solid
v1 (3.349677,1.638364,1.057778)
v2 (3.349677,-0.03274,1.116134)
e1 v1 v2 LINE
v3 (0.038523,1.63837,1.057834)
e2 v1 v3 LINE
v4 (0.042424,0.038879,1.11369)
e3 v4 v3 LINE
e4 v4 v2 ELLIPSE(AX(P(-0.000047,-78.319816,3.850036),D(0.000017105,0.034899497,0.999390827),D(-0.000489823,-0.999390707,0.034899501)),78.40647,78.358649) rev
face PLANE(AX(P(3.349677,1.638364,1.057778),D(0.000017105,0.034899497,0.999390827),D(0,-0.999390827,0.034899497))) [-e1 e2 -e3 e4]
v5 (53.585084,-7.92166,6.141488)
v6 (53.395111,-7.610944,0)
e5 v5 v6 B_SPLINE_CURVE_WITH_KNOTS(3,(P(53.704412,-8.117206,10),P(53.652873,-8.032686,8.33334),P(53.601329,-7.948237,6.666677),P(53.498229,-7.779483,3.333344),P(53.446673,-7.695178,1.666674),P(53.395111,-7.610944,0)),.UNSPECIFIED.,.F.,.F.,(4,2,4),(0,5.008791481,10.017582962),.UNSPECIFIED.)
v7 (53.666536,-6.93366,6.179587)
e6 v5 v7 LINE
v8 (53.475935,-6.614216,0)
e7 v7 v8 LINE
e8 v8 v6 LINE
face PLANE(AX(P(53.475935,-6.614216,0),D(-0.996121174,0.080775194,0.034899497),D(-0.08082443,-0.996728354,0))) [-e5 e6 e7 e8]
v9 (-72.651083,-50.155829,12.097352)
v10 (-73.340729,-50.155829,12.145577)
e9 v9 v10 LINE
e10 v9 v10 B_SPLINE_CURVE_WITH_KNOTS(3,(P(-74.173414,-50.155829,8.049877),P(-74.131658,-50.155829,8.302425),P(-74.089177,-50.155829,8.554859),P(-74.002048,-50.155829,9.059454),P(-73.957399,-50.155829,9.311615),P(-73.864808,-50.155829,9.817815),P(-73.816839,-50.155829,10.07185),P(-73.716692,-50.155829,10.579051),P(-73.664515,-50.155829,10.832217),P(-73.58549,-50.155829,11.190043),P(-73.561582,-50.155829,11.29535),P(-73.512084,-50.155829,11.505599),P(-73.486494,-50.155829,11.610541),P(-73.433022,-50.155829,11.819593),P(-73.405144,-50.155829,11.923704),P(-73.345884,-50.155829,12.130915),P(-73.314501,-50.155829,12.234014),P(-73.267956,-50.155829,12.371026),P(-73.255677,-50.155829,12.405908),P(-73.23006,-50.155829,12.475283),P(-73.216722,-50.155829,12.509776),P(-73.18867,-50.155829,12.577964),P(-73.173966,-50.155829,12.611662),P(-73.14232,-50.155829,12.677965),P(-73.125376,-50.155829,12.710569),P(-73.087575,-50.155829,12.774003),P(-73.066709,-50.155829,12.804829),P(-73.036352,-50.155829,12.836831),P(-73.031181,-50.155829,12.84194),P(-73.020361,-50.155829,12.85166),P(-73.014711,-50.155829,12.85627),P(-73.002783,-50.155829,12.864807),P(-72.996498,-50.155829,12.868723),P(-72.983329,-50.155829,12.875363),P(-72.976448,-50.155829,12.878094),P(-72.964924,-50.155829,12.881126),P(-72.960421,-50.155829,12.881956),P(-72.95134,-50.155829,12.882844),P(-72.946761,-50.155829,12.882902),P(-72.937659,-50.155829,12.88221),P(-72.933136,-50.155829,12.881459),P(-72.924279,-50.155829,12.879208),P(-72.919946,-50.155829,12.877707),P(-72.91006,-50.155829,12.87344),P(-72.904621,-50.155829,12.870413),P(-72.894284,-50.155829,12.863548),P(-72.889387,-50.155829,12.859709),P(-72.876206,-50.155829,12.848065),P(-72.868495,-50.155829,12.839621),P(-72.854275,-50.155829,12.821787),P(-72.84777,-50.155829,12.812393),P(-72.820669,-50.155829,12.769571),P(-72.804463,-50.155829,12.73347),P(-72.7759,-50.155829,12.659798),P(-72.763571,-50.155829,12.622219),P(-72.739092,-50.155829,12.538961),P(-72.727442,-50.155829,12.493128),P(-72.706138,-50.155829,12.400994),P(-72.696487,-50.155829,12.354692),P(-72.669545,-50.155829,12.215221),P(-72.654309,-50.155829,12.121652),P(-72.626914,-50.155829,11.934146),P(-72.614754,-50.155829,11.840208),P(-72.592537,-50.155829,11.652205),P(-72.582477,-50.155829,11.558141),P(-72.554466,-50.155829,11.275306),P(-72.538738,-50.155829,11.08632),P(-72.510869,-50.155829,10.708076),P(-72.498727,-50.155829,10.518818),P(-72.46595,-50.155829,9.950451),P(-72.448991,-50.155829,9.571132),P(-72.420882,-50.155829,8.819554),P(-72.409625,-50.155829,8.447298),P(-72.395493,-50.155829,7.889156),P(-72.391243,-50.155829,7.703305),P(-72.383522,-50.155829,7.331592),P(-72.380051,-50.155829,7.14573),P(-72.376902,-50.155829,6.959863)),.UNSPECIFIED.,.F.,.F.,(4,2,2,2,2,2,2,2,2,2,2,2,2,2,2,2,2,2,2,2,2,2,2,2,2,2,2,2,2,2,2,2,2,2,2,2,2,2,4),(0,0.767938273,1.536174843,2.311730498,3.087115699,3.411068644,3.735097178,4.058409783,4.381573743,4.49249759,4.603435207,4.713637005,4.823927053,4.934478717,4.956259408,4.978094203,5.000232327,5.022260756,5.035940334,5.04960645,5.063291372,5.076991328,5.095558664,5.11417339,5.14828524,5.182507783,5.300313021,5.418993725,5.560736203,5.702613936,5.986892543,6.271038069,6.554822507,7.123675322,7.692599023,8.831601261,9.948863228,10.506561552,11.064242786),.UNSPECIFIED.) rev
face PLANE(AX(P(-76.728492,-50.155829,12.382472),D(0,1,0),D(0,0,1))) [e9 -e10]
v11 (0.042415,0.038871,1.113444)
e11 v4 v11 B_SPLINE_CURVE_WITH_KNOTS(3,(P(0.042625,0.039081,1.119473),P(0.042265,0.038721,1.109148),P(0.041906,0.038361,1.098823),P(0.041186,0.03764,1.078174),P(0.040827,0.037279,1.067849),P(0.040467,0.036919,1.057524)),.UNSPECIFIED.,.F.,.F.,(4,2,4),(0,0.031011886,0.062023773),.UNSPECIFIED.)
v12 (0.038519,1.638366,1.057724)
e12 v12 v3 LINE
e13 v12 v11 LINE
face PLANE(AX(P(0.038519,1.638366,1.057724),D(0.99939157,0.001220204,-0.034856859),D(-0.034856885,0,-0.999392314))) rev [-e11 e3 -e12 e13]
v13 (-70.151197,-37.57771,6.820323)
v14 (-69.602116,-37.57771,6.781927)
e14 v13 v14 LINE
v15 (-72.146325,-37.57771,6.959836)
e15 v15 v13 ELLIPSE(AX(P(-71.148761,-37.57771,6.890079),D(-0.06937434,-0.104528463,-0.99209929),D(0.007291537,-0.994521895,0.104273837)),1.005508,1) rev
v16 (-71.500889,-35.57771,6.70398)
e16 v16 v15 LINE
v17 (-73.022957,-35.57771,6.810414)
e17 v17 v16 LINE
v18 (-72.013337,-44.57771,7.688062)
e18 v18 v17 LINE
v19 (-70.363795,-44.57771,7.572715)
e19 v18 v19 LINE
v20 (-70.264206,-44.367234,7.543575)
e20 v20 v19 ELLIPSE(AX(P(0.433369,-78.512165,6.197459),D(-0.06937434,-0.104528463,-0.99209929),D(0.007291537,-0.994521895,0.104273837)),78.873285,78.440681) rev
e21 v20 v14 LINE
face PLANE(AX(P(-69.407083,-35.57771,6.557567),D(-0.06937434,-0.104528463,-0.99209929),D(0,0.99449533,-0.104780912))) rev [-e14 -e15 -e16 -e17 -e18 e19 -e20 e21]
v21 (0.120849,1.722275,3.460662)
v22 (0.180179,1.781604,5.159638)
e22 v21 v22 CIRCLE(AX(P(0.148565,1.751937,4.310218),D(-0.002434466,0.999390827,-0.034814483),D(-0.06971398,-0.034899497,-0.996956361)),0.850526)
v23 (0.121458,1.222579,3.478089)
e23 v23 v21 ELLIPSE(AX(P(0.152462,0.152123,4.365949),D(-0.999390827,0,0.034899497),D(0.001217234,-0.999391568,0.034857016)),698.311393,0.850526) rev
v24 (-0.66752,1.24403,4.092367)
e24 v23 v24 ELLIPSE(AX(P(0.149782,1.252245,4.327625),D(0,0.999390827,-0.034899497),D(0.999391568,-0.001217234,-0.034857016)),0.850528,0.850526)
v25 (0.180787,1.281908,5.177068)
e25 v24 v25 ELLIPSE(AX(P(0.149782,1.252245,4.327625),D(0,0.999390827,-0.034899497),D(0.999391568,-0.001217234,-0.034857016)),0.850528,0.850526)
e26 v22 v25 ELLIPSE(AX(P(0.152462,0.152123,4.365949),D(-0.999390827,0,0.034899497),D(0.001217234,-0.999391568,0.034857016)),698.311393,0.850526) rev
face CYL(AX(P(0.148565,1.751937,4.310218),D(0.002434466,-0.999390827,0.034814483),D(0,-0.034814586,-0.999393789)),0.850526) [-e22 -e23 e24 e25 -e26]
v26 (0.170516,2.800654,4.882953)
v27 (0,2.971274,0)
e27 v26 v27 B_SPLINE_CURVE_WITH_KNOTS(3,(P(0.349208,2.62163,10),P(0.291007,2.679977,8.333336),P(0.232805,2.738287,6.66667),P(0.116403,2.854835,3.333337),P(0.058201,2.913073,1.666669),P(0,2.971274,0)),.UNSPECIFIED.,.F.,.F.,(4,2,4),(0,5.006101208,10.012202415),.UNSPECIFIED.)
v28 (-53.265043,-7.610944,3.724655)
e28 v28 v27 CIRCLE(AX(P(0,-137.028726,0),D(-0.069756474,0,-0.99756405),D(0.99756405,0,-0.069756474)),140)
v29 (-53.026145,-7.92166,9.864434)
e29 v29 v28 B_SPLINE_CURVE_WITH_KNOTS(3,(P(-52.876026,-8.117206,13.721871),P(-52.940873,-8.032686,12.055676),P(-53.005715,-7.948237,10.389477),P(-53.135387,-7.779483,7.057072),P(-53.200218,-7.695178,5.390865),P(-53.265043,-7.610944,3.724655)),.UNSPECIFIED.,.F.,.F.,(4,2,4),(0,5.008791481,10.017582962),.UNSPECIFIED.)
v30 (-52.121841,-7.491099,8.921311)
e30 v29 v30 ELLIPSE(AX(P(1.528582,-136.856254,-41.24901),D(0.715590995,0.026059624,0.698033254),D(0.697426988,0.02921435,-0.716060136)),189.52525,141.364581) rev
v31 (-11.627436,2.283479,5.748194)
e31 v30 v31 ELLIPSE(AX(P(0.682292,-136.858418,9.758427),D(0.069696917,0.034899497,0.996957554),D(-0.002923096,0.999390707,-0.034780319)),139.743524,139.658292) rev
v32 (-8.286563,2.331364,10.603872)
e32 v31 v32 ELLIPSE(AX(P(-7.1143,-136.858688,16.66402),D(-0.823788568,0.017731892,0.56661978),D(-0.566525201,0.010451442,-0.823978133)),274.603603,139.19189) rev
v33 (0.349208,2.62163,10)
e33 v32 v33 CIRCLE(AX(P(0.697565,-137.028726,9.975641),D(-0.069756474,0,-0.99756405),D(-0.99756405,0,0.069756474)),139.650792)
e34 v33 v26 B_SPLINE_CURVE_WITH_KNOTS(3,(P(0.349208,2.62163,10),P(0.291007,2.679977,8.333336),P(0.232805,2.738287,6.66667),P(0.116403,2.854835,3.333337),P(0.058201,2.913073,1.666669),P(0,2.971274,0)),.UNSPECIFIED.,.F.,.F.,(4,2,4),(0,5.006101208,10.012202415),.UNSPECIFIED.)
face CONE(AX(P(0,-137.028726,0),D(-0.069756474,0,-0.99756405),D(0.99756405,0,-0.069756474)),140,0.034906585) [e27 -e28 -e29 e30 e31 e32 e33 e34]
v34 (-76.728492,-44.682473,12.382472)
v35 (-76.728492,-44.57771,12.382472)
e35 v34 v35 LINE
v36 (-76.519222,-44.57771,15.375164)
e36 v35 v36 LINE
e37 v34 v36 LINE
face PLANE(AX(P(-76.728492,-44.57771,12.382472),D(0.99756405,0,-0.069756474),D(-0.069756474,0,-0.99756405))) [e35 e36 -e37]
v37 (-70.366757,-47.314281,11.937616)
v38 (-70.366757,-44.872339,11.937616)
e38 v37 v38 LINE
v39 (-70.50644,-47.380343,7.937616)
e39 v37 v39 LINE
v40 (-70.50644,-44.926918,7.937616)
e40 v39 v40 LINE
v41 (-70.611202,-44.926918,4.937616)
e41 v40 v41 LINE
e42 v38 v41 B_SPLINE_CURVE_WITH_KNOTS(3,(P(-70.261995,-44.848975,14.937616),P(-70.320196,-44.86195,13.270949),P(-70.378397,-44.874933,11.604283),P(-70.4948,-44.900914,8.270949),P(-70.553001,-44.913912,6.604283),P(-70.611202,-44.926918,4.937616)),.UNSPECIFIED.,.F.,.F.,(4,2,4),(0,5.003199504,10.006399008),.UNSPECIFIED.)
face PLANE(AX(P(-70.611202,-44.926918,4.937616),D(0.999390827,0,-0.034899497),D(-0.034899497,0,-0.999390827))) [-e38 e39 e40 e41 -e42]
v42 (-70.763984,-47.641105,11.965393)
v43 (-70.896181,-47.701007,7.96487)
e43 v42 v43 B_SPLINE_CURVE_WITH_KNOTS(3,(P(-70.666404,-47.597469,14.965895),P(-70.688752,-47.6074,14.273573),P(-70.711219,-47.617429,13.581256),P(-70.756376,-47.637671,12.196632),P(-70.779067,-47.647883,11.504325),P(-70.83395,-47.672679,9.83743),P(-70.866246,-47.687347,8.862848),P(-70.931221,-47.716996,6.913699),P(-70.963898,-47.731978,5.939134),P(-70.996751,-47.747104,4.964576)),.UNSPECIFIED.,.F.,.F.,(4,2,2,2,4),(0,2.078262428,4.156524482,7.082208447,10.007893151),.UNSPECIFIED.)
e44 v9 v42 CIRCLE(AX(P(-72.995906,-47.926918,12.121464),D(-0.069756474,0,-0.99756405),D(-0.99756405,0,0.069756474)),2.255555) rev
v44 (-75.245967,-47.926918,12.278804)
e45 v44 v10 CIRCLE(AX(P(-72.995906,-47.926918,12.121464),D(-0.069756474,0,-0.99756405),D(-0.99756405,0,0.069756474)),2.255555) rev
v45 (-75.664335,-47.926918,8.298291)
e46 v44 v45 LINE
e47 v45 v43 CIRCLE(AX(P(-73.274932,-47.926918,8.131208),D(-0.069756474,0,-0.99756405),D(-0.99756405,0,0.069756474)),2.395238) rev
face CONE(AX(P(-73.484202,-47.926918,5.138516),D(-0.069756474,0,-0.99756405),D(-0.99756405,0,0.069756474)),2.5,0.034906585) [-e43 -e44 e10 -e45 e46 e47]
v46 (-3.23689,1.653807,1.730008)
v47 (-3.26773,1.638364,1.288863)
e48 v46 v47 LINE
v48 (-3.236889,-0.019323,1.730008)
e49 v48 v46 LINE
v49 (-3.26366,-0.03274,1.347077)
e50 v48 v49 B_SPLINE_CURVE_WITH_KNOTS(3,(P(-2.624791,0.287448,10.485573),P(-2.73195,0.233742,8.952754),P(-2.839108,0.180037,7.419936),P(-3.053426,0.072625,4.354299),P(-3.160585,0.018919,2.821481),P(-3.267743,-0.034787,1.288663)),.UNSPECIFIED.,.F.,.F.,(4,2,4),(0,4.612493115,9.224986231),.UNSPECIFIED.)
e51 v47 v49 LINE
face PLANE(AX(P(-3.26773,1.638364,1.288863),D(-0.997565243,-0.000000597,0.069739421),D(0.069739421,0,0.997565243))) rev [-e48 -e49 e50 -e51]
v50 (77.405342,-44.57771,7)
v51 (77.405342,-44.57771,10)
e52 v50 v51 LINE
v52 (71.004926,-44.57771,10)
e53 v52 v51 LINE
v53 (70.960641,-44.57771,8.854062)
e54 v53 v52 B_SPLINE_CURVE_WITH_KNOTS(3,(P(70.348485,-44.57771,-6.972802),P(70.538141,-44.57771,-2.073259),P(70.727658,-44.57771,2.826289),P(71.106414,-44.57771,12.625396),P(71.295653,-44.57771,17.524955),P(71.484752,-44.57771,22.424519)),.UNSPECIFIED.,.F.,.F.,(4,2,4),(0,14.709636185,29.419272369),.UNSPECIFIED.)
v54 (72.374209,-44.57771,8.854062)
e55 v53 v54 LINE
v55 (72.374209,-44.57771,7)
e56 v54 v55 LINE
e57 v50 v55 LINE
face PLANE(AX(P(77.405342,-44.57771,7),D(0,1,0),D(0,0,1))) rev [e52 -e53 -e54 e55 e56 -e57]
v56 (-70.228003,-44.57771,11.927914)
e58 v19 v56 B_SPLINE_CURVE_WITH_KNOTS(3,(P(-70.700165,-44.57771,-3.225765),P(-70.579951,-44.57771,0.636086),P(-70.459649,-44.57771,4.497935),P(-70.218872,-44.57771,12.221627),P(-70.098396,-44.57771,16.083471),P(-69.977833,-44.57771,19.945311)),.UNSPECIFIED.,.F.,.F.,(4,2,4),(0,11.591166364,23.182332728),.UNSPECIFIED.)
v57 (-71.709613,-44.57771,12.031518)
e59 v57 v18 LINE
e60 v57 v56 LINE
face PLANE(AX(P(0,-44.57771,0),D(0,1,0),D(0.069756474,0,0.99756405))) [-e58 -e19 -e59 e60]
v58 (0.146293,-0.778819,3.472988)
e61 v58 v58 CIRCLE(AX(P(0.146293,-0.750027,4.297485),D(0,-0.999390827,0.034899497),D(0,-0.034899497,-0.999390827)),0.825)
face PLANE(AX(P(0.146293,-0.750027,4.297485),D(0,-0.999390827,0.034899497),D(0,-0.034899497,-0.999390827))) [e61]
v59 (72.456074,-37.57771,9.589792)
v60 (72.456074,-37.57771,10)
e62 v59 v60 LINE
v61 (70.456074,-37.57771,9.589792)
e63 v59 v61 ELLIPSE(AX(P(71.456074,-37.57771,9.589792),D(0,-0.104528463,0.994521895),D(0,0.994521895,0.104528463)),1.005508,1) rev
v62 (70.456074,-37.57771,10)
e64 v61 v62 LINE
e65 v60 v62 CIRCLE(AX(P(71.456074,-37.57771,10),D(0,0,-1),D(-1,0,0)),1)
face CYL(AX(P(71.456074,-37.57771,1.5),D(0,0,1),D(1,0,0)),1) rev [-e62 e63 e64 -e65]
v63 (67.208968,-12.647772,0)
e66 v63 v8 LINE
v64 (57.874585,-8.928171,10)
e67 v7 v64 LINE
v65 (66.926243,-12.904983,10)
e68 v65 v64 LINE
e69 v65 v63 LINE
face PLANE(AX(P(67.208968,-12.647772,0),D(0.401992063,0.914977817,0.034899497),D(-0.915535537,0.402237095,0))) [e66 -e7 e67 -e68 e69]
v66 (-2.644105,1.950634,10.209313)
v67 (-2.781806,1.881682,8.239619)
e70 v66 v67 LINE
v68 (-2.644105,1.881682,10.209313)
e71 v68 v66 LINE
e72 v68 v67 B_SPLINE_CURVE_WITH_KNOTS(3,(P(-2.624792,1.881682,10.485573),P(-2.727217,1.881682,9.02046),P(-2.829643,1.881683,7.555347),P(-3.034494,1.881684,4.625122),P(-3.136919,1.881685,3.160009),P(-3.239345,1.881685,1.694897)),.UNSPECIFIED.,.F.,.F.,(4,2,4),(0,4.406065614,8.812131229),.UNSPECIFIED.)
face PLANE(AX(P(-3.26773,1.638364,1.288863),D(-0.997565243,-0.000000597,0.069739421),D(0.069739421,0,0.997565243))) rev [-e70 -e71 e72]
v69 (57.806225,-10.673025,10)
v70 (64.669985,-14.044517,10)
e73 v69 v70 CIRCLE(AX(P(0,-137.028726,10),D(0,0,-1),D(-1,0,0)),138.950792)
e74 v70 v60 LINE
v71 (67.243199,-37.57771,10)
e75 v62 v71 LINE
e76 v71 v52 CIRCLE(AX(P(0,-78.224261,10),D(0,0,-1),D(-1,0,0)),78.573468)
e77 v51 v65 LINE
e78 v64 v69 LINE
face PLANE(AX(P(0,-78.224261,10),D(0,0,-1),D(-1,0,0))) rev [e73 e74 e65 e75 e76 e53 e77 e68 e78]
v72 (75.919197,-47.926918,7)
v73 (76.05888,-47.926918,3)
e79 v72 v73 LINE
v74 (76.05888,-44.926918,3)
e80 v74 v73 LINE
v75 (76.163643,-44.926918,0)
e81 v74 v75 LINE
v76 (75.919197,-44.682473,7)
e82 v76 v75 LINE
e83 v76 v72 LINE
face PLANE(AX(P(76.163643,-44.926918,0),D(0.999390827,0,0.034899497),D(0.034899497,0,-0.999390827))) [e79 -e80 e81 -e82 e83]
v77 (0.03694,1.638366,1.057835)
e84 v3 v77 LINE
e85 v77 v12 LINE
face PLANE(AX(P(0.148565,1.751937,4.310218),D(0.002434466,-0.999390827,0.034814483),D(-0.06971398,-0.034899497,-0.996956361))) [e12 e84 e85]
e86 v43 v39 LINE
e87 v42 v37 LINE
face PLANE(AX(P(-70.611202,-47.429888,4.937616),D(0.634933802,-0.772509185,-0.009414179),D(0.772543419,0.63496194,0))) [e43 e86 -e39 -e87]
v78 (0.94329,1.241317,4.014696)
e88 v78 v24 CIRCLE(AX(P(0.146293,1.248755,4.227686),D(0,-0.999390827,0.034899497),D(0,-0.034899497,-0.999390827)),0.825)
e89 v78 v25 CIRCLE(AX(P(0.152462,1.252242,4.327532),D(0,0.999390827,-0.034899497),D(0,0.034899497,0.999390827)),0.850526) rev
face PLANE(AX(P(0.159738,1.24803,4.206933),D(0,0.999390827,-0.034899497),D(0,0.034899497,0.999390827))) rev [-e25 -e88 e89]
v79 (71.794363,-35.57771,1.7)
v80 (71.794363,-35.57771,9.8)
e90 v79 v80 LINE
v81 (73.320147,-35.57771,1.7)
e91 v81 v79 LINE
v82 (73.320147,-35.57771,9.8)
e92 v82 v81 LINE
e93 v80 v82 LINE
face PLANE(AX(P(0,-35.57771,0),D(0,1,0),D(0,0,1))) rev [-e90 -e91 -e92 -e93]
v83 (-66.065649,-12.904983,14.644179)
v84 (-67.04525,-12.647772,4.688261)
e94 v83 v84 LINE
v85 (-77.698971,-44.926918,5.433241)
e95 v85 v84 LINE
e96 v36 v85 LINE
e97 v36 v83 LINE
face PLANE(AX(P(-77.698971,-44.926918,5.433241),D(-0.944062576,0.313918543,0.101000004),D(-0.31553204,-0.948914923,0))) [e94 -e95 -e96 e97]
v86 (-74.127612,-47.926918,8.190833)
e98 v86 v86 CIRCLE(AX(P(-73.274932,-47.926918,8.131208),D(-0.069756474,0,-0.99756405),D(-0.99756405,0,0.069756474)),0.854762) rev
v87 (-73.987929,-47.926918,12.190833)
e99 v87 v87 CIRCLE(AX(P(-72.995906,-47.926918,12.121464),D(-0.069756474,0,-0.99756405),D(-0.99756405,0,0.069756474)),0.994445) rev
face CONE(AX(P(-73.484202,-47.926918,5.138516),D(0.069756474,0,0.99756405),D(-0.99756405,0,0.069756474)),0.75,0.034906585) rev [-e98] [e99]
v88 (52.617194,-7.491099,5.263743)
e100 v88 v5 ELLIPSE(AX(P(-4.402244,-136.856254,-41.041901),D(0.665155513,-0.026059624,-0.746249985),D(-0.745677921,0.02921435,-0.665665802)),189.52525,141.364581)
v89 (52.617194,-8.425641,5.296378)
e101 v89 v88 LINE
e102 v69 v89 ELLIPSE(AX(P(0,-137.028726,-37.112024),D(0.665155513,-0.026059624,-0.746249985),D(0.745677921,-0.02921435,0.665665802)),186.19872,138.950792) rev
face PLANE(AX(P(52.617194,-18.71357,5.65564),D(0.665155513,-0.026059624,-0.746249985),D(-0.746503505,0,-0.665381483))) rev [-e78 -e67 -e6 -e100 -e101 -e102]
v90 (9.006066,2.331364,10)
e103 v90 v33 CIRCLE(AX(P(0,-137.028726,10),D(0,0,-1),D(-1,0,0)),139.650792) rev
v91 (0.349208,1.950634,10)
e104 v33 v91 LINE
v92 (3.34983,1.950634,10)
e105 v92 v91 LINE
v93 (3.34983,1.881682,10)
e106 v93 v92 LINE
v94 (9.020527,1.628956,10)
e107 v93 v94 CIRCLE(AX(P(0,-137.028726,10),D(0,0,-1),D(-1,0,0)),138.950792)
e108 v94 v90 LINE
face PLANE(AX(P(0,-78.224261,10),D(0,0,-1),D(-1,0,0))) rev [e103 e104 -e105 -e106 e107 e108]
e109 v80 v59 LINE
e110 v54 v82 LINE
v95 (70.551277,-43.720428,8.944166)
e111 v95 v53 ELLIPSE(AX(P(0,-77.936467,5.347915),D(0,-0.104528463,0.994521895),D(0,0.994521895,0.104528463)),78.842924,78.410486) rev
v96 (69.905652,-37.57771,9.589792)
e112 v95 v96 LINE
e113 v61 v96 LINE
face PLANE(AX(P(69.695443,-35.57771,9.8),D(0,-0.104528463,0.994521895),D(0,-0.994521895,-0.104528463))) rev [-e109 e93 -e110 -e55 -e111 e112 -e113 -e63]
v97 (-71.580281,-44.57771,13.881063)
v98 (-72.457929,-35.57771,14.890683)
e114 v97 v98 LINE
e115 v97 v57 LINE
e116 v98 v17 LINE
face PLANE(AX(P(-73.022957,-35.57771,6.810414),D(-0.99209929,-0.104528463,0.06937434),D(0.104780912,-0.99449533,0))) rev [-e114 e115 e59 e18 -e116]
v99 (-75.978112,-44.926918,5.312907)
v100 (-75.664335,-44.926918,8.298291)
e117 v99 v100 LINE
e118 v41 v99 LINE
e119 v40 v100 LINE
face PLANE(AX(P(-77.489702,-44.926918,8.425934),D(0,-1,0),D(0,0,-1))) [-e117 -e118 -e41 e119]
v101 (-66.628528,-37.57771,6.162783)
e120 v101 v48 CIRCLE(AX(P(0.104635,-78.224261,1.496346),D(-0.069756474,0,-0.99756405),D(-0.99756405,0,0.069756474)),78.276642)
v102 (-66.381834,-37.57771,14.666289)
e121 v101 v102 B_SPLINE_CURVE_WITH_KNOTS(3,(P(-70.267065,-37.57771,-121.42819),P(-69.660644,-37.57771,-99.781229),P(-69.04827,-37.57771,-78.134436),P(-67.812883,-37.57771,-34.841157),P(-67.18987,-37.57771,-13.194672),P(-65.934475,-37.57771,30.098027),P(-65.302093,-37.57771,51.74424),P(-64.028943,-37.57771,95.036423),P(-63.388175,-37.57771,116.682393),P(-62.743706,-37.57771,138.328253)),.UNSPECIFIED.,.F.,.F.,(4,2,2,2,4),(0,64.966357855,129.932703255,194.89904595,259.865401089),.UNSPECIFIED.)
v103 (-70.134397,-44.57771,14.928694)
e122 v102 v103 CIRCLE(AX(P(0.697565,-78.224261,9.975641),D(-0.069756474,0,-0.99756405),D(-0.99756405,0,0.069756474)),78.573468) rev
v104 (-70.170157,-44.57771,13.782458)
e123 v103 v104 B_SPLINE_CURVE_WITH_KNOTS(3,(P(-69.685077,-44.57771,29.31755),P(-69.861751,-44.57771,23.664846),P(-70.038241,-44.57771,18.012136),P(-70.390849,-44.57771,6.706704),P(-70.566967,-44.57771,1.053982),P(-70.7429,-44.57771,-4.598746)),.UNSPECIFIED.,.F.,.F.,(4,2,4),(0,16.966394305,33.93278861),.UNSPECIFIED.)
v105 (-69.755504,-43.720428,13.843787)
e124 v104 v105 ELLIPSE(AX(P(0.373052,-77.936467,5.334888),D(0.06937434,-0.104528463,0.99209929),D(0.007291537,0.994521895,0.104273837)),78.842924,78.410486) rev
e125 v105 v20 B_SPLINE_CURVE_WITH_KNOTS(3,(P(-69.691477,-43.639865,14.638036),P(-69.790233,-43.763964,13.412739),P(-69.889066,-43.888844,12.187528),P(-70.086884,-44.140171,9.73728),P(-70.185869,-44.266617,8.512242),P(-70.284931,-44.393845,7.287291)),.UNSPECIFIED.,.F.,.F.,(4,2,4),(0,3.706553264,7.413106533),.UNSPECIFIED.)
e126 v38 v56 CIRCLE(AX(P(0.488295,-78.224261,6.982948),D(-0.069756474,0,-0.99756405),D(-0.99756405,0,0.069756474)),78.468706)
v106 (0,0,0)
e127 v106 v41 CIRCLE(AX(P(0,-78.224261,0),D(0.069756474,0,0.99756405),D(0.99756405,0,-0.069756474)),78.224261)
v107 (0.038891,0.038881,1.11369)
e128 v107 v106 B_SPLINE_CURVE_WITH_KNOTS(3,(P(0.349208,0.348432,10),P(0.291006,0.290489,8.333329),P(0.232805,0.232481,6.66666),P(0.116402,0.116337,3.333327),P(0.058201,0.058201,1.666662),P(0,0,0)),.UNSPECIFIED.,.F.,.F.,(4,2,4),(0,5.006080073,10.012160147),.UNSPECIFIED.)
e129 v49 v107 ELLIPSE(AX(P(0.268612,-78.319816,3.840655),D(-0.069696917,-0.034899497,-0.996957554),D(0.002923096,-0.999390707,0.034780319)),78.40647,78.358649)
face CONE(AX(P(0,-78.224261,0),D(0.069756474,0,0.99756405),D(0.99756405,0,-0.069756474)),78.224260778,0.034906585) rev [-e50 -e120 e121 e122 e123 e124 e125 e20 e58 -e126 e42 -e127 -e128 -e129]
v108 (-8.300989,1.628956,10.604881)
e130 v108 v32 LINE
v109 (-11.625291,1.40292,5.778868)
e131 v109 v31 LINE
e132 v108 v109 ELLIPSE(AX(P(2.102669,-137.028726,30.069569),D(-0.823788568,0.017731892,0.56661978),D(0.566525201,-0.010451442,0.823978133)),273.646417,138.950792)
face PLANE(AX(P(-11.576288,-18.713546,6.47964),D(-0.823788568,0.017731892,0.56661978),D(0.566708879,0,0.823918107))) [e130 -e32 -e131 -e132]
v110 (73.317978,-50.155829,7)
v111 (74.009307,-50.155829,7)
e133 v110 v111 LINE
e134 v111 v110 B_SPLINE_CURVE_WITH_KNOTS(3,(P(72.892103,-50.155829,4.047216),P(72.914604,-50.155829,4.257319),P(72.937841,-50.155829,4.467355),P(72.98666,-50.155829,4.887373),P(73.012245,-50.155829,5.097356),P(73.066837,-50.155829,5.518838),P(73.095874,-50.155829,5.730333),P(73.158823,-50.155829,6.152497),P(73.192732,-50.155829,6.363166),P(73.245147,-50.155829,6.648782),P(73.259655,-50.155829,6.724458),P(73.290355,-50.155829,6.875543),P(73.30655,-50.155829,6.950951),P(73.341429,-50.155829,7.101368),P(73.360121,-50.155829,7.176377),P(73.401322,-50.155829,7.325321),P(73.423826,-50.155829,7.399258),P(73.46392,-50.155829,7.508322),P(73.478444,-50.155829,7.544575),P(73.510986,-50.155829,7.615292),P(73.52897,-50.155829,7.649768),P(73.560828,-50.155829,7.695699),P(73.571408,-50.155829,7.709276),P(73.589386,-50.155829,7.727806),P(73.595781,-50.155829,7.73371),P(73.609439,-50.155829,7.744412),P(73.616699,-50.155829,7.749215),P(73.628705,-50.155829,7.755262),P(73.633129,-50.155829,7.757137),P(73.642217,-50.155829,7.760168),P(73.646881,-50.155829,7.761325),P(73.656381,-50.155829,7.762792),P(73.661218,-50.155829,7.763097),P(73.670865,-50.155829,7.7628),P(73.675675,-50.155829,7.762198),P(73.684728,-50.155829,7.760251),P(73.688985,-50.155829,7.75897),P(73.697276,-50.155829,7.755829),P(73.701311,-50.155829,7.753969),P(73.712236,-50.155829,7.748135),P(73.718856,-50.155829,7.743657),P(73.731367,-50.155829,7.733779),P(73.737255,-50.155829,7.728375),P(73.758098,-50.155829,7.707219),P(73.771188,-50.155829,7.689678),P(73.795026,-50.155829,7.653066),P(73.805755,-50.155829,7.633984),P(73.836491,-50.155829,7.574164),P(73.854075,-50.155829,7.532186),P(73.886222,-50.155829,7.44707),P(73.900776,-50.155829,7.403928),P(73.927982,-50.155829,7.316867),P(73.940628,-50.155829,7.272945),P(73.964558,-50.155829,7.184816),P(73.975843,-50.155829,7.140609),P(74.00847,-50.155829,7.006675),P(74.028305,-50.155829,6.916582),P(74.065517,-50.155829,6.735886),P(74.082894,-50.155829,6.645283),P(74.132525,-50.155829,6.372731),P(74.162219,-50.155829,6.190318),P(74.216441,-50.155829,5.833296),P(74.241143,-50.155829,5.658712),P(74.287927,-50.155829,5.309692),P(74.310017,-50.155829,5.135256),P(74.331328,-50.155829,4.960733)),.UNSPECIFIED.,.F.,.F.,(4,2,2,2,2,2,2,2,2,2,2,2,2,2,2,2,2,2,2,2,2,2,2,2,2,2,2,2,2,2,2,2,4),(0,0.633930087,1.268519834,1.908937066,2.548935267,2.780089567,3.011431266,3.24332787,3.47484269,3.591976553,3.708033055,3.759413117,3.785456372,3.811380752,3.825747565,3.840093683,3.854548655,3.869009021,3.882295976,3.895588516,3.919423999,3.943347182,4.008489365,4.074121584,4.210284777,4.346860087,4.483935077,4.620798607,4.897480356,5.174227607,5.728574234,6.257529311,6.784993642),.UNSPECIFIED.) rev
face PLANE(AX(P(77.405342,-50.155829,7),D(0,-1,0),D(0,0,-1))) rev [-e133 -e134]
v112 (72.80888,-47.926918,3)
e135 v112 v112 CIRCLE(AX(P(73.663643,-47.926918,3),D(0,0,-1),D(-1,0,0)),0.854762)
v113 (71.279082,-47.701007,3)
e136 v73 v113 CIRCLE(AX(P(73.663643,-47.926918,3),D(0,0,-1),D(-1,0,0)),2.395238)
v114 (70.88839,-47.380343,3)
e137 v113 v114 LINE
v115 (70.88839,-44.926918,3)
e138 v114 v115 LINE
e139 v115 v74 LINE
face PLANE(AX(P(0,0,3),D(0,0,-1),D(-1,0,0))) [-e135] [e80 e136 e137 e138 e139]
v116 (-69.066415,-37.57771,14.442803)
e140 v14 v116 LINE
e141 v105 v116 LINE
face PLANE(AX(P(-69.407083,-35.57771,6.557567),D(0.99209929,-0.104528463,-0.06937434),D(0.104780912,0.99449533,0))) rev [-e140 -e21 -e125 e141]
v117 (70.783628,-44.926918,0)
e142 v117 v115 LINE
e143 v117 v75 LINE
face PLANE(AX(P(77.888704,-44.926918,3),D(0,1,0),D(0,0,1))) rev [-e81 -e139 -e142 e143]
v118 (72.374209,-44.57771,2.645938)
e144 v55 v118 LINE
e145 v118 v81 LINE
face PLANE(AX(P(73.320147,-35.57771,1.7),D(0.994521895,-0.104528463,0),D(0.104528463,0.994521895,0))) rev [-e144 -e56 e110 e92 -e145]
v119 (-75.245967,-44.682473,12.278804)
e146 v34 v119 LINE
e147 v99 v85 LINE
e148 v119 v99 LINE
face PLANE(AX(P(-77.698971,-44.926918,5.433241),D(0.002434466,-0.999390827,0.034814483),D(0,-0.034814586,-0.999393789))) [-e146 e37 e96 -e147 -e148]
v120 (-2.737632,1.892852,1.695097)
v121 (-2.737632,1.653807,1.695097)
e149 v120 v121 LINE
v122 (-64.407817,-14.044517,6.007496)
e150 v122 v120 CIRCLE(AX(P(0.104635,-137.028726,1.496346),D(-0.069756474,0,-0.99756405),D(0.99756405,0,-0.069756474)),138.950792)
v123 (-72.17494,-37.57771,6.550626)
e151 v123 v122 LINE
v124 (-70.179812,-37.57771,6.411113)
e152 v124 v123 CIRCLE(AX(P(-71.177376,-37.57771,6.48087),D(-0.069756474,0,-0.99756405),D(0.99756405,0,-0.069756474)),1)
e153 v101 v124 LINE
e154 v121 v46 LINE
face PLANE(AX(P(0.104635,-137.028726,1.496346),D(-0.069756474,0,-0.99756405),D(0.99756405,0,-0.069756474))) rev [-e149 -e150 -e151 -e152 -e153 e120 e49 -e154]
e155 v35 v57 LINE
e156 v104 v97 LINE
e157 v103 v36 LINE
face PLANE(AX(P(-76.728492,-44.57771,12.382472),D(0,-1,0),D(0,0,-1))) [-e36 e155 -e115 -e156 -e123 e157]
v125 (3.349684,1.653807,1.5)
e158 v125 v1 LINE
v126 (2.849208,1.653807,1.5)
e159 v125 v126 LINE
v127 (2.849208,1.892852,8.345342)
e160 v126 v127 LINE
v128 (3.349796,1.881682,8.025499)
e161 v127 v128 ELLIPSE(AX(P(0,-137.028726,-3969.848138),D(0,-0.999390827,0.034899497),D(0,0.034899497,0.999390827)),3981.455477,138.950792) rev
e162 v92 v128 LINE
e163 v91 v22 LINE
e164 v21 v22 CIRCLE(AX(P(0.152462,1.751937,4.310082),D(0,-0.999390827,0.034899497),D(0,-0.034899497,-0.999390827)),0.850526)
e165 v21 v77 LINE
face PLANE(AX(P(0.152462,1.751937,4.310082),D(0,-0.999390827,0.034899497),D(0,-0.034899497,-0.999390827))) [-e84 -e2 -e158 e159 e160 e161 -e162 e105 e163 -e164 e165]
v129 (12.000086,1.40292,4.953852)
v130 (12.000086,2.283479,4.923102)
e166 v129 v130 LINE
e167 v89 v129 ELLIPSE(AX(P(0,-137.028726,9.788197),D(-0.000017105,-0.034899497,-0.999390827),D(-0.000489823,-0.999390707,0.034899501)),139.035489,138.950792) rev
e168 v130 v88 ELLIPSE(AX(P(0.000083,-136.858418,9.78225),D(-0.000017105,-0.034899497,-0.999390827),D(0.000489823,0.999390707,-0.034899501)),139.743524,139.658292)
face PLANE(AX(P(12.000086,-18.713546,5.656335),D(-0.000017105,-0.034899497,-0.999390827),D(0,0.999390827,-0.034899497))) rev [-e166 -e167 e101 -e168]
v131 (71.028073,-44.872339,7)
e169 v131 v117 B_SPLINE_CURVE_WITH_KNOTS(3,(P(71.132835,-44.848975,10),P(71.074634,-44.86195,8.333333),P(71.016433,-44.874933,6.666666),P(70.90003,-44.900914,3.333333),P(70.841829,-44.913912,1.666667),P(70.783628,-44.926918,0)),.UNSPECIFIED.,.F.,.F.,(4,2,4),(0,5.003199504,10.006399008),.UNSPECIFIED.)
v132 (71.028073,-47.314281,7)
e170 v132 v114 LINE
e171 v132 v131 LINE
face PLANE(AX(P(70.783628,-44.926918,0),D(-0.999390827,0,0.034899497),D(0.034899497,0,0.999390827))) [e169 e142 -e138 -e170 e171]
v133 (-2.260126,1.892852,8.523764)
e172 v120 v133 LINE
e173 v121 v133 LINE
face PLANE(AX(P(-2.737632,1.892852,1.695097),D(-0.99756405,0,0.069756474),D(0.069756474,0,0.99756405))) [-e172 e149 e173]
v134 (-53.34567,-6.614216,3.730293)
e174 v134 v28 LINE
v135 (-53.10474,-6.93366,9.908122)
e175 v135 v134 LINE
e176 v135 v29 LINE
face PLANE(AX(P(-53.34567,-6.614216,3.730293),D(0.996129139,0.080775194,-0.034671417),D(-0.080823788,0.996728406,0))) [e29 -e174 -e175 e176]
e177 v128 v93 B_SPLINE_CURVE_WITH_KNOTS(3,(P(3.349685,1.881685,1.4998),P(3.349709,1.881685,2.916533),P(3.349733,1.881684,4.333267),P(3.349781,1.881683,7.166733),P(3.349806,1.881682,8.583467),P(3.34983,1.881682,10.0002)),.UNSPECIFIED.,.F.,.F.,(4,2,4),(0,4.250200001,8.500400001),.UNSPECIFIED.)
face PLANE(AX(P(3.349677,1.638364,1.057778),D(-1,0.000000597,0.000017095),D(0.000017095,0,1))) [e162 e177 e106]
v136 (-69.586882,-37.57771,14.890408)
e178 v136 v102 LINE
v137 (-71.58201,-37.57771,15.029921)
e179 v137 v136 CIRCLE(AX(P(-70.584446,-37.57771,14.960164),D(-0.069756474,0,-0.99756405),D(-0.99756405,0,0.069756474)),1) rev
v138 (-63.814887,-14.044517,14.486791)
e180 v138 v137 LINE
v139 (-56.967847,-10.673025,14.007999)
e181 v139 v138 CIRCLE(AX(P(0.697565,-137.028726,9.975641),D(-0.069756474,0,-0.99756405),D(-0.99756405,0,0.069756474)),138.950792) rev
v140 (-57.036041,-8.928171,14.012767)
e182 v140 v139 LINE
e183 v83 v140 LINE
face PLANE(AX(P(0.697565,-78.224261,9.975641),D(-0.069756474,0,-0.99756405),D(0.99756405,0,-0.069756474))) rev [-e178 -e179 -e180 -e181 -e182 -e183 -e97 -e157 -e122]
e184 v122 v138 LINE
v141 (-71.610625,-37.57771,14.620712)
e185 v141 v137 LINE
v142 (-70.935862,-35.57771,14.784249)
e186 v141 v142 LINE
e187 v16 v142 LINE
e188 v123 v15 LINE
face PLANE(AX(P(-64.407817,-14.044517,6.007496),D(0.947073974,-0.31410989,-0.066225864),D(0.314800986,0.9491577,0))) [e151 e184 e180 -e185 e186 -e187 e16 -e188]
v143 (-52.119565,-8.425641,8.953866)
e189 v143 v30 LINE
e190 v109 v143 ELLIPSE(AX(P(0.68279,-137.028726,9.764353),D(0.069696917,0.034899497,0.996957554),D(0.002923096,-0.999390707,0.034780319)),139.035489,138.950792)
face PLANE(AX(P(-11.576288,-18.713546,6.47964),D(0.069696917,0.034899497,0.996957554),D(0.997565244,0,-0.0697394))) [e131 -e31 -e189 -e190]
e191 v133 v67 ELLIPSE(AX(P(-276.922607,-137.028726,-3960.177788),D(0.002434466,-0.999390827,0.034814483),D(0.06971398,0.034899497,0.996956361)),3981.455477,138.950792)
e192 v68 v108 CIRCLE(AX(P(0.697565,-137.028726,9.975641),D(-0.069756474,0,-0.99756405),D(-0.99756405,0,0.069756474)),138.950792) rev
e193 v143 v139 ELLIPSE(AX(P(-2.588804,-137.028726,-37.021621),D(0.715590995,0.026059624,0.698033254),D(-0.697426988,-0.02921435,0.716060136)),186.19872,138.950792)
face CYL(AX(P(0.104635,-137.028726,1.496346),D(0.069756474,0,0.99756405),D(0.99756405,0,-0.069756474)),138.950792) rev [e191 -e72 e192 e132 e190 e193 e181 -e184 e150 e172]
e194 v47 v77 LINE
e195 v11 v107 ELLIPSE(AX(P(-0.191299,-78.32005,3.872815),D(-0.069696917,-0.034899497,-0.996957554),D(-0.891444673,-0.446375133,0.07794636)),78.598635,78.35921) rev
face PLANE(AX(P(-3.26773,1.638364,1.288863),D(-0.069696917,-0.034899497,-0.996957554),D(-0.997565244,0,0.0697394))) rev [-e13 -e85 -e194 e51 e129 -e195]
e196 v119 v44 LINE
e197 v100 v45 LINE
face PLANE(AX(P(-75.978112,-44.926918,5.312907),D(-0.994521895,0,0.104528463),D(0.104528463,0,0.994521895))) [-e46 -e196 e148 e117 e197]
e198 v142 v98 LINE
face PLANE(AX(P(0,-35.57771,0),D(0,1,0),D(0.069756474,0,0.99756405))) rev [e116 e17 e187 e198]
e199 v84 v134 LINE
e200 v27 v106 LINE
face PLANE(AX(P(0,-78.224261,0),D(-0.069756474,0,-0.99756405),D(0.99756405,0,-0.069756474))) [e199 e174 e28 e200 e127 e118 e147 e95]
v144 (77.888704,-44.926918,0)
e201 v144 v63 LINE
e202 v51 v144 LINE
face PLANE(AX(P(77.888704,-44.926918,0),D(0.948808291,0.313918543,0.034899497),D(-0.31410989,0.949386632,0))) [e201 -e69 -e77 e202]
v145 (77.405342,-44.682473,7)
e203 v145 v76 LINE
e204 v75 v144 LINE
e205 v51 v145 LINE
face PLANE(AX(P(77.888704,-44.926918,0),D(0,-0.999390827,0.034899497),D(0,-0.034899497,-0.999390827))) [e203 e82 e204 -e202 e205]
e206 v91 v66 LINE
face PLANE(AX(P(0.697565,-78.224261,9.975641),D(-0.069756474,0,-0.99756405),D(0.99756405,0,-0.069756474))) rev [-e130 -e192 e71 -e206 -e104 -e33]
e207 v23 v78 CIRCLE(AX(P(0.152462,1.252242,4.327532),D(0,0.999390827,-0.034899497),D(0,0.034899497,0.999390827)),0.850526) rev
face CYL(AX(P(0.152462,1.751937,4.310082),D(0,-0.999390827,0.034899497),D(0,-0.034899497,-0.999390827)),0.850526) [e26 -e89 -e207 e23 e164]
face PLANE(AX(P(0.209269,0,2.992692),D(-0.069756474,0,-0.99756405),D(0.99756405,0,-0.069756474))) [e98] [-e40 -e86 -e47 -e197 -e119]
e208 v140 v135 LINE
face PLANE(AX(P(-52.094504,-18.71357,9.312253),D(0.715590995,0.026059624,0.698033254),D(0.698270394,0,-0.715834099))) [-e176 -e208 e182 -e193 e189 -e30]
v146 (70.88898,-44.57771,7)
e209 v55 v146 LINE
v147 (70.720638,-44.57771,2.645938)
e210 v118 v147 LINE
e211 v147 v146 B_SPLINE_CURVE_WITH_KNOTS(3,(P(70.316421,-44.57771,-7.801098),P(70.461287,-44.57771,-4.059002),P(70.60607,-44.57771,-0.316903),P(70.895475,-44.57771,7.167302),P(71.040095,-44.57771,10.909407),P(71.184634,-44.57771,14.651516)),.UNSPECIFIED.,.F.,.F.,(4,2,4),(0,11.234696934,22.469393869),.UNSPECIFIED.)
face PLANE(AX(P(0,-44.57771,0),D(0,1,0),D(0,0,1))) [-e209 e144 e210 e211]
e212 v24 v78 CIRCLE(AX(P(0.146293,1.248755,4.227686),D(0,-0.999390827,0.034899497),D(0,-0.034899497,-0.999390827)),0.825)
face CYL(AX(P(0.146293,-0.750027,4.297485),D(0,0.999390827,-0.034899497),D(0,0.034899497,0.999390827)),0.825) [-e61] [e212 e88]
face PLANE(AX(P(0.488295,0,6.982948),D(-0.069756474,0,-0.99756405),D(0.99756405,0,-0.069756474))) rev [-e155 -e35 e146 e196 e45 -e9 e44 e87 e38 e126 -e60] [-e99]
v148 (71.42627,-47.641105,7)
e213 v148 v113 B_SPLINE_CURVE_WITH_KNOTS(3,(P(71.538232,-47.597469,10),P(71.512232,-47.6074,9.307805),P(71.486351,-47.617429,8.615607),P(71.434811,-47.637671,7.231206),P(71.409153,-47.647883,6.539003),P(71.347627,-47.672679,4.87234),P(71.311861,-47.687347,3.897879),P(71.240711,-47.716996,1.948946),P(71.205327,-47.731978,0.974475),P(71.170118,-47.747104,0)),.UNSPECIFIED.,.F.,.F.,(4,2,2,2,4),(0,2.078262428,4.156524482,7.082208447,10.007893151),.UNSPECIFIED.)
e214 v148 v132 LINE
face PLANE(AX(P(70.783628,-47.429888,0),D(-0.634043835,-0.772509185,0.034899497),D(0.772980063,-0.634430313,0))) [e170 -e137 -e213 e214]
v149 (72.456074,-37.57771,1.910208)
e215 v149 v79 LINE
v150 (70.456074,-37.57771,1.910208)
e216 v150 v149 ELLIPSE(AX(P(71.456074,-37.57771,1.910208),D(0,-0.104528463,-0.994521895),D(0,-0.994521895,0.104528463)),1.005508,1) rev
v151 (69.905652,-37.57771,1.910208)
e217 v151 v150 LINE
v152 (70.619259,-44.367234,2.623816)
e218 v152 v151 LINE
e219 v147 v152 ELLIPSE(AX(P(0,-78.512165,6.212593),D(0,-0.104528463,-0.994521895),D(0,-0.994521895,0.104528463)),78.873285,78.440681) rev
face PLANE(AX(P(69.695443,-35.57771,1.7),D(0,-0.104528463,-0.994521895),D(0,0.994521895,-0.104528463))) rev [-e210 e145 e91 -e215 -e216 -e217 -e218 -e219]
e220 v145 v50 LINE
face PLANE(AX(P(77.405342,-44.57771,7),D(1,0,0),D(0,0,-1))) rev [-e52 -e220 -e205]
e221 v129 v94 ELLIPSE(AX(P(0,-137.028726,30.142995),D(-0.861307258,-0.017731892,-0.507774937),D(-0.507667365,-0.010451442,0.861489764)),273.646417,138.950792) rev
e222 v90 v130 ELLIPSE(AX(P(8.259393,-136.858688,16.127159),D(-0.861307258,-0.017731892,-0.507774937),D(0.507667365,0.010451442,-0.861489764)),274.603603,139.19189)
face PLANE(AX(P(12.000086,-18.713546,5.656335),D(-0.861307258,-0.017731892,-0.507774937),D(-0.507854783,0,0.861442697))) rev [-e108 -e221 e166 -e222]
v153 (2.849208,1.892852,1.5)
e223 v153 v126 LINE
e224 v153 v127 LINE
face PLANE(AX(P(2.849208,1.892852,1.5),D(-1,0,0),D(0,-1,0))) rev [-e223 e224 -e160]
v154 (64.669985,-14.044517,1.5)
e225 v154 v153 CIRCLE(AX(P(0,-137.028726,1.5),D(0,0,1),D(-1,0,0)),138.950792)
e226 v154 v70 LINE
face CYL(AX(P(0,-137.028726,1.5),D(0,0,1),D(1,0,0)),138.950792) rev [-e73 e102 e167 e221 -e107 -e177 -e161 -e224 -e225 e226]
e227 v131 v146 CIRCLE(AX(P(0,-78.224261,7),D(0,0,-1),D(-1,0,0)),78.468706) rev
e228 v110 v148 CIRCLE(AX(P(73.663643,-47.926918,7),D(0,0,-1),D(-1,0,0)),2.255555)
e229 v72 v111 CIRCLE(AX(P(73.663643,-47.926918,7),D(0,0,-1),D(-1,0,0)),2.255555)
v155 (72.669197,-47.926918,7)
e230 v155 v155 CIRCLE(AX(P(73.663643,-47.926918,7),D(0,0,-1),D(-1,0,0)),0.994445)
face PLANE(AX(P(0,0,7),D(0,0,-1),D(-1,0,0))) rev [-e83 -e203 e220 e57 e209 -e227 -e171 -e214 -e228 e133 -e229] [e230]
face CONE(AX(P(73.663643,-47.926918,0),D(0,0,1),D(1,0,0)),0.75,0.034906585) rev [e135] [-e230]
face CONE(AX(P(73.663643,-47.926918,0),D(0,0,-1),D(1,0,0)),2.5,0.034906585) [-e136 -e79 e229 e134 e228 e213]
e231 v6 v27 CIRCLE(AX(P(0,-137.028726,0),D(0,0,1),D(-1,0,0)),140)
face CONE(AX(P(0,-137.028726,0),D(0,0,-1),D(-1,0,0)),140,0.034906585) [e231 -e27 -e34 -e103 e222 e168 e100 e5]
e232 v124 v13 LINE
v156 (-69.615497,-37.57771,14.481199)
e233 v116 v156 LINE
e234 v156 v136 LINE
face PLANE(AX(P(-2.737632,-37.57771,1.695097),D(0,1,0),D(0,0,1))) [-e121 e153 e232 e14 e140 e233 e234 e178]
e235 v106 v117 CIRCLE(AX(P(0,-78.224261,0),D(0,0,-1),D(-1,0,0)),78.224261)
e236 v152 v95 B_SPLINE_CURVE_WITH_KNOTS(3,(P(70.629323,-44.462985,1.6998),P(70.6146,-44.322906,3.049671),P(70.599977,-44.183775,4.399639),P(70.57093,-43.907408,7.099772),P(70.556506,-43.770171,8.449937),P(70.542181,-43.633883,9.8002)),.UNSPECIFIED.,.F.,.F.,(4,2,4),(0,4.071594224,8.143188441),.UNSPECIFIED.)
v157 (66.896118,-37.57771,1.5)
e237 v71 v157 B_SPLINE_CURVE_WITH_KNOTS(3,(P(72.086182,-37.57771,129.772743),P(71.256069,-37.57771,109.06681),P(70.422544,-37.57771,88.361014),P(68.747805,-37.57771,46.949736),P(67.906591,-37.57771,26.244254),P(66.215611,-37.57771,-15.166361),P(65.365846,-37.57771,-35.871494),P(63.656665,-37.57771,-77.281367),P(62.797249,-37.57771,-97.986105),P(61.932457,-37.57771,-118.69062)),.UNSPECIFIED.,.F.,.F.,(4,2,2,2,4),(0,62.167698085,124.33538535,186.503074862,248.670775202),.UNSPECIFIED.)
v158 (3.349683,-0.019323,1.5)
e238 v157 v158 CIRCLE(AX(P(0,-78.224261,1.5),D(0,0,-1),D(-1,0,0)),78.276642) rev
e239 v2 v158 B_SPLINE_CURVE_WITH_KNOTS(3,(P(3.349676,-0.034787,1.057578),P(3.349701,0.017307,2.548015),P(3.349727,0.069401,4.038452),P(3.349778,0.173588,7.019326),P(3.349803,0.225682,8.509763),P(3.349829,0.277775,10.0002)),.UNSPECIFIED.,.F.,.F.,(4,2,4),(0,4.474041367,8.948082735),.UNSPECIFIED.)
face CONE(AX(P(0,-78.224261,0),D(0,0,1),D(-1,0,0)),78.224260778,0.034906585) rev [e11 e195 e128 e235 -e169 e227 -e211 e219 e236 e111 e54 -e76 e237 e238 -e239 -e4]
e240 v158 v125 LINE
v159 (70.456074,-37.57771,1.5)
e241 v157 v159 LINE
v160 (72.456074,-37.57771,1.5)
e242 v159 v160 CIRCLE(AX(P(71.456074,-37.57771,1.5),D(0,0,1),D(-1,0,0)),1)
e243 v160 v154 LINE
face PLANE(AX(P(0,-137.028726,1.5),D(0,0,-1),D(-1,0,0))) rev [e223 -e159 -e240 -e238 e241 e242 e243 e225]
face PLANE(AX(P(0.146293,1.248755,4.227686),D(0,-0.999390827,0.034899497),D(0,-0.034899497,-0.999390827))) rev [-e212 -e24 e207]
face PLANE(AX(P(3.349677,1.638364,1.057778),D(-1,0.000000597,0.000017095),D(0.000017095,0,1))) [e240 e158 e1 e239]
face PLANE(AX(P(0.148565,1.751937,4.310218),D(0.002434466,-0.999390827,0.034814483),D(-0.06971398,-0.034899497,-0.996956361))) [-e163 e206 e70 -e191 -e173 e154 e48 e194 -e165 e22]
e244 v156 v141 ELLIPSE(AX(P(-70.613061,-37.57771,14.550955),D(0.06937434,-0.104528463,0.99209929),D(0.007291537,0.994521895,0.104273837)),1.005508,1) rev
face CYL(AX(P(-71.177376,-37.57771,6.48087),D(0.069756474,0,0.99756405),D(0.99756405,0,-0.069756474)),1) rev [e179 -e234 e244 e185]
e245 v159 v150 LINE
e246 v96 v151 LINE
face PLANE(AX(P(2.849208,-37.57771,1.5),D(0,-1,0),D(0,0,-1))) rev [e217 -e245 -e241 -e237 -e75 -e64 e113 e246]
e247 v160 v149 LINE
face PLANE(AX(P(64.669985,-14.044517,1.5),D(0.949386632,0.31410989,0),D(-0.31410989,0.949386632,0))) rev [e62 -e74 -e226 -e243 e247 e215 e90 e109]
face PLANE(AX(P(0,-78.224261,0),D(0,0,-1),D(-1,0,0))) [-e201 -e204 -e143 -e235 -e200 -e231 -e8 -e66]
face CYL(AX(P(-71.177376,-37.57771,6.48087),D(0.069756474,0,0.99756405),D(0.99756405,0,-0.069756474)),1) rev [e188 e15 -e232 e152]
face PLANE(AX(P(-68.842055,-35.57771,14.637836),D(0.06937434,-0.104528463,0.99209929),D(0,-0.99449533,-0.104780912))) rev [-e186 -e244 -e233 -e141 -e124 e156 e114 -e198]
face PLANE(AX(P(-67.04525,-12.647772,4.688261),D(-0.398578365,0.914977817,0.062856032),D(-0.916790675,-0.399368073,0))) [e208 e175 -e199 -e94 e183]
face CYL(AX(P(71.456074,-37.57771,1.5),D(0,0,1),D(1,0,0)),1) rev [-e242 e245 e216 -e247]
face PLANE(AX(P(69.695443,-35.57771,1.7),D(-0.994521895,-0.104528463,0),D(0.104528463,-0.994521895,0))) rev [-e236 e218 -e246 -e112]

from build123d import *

# Parameters (mm, degrees)
ESQUISSE1_R             = 0.75
BOSS_EXTRU_1_DEPTH      = 10
BOSS_EXTRU_1_DRAFT      = 2
ESQUISSE2_W             = 13.85789223
ESQUISSE2_H             = 8.60111757
ENL_V_MAT_EXTRU_1_DEPTH = 13
ESQUISSE5_W             = 12.990785821
ESQUISSE5_H             = 5.57811828
ENL_V_MAT_EXTRU_3_DEPTH = 13
ENL_V_MAT_EXTRU_4_DEPTH = 18.5
ESQUISSE8_W             = 3.624703647
ESQUISSE8_H             = 8.1
ENL_V_MAT_EXTRU_7_DEPTH = 9
ENL_V_MAT_EXTRU_7_DRAFT = -6
ENL_V_MAT_EXTRU_8_DEPTH = 6.5
ENL_V_MAT_EXTRU_6_DEPTH = 24
ESQUISSE12_R            = 1.011324244
ENL_V_MAT_EXTRU_9_DEPTH = 6
ESQUISSE17_R            = 0.825
BOSS_EXTRU_2_DEPTH      = 2


# Read off the part's stored shape, not the designer's step: Symétrie2
with BuildPart() as part:
    # Esquisse1 → Boss.-Extru.1 (with draft: the straight prism first)
    with BuildSketch(Plane.XY):
        with BuildLine():
            Line((77.8887043, -44.926917936), (67.208968034, -12.647772451))
            Line((67.208968034, -12.647772451), (53.475934981, -6.614216024))
            Line((53.475934981, -6.614216024), (53.395110551, -7.610944377))
            ThreePointArc((53.395110551, -7.610944377), (27.216820071, 0.300239401), (0, 2.971274119))
            Line((0, 2.971274119), (0, 0))
            ThreePointArc((0, 0), (41.918820025, -12.179976378), (70.783627584, -44.926917936))
            Line((70.783627584, -44.926917936), (70.783627584, -47.429888392))
            Line((70.783627584, -47.429888392), (71.170117615, -47.747103549))
            ThreePointArc((71.170117615, -47.747103549), (73.573677122, -50.425298655), (76.163642587, -47.926917936))
            Line((76.163642587, -47.926917936), (76.163642587, -44.926917936))
            Line((76.163642587, -44.926917936), (77.8887043, -44.926917936))
        make_face()
        with Locations((73.663642587, -47.926917936)):
            Circle(ESQUISSE1_R, mode=Mode.SUBTRACT)
    extrude(amount=BOSS_EXTRU_1_DEPTH)
    # Boss.-Extru.1: the draft: its side faces are tilted about the plane it starts from
    boss_extru_1_sides = [part.faces().sort_by_distance(p)[0] for p in [
        (72.548836167, -28.787345194, 5),
        (60.342451508, -9.630994237, 5),
        (53.435522766, -7.1125802, 5),
        (27.216820071, 0.300239401, 5),
        (0, 1.48563706, 5),
        (41.918820025, -12.179976378, 5),
        (70.783627584, -46.178403164, 5),
        (70.9768726, -47.588495971, 5),
        (73.573677122, -50.425298655, 5),
        (76.163642587, -46.426917936, 5),
        (77.026173444, -44.926917936, 5),
        (72.913642587, -47.926917936, 5),
    ]]
    draft(boss_extru_1_sides, Plane.XY, BOSS_EXTRU_1_DRAFT)

    # Esquisse2 → Enlèv. mat.-Extru.1 (cut)
    with BuildSketch(Plane(origin=(0, 0, -10), x_dir=(-1, 0, 0), z_dir=(0, 0, -1))):
        with Locations((-70.959758185, -49.227476721)):
            Rectangle(ESQUISSE2_W, ESQUISSE2_H)
    extrude(amount=-ENL_V_MAT_EXTRU_1_DEPTH, mode=Mode.SUBTRACT)

    # Esquisse5 → Enlèv. mat.-Extru.3 (cut)
    with BuildSketch(Plane.XY.offset(20)):
        with Locations((70.909949533, -47.366769381)):
            Rectangle(ESQUISSE5_W, ESQUISSE5_H)
    extrude(amount=-ENL_V_MAT_EXTRU_3_DEPTH, mode=Mode.SUBTRACT)

    # Esquisse6 → Enlèv. mat.-Extru.4 (cut)
    with BuildSketch(Plane.XY.offset(20)):
        with BuildLine():
            Line((64.669985027, -14.044516655), (72.45607407, -37.577710241))
            ThreePointArc((72.45607407, -37.577710241), (71.45607407, -38.577710241), (70.45607407, -37.577710241))
            Line((70.45607407, -37.577710241), (2.849207695, -37.577710241))
            Line((2.849207695, -37.577710241), (2.849207695, 1.892851629))
            ThreePointArc((2.849207695, 1.892851629), (34.687321508, -2.477202631), (64.669985027, -14.044516655))
        make_face()
    extrude(amount=-ENL_V_MAT_EXTRU_4_DEPTH, mode=Mode.SUBTRACT)


with BuildPart() as enl_v_mat_extru_7_tool:
    # Esquisse8 → Enlèv. mat.-Extru.7 (with draft: the straight prism first)
    with BuildSketch(Plane(origin=(0, -35.577710241, 0), x_dir=(1, 0, 0), z_dir=(0, 1, 0))):
        with Locations((71.507795019, -5.75)):
            Rectangle(ESQUISSE8_W, ESQUISSE8_H)
    extrude(amount=-ENL_V_MAT_EXTRU_7_DEPTH)
    # Enlèv. mat.-Extru.7: the draft: its side faces are tilted about the plane it starts from
    enl_v_mat_extru_7_sides = [enl_v_mat_extru_7_tool.faces().sort_by_distance(p)[0] for p in [
        (69.695443195, -40.077710241, 5.75),
        (71.507795019, -40.077710241, 9.8),
        (73.320146842, -40.077710241, 5.75),
        (71.507795019, -40.077710241, 1.7),
    ]]
    draft(enl_v_mat_extru_7_sides, Plane(origin=(0, -35.577710241, 0), x_dir=(1, 0, 0), z_dir=(0, 1, 0)), ENL_V_MAT_EXTRU_7_DRAFT)


with BuildPart() as part_1:
    add(part.part)

    # Enlèv. mat.-Extru.7: cut by enl_v_mat_extru_7_tool
    add(enl_v_mat_extru_7_tool.part, mode=Mode.SUBTRACT)

    # Esquisse9 → Enlèv. mat.-Extru.8 (cut)
    with BuildSketch(Plane(origin=(0, -4.896564999, 0.170991818), x_dir=(0.9999999998537095, -5.969561417335715e-07, -1.7094587273474584e-05), z_dir=(0, 0.9993908270190958, -0.03489949670250105))):
        with BuildLine():
            Line((3.349657801, -1.114368939), (0.03533908, -1.114368939))
            Line((0.03533908, -1.114368939), (0.119413388, -3.518714663))
            ThreePointArc((0.119413388, -3.518714663), (1.002393791, -4.338878244), (0.178858385, -5.218714663))
            Line((0.178858385, -5.218714663), (0.349657801, -10.103213324))
            Line((0.349657801, -10.103213324), (3.349657801, -10.111959186))
            Line((3.349657801, -10.111959186), (3.349657801, -1.114368939))
        make_face()
    extrude(amount=ENL_V_MAT_EXTRU_8_DEPTH, mode=Mode.SUBTRACT)

    # Esquisse7 → Enlèv. mat.-Extru.6 (cut)
    with BuildSketch(Plane(origin=(0, 5.097343272, -0.178003149), x_dir=(0.9999999998537095, -5.969561417335715e-07, -1.7094587273474584e-05), z_dir=(0, 0.9993908270190958, -0.03489949670250105))):
        Polygon((12, -5.000000781), (9, -10.085416779), (58.325804645, -10.085411957), (52.617108891, -5.000000781), align=None)
    extrude(amount=-ENL_V_MAT_EXTRU_6_DEPTH, mode=Mode.SUBTRACT)

    # Symétrie2: part across plane


with BuildPart() as part_2:
    add(part_1.part)
    add(part_1.part.mirror(Plane(origin=(0, 0, 0), x_dir=(0.034899496702501046, 0, 0.9993908270190957), z_dir=(-0.9993908270190958, 0, 0.034899496702501046))))

    # Esquisse12 → Enlèv. mat.-Extru.9 (cut)
    with BuildSketch(Plane(origin=(0, -4.896564999, 0.170991818), x_dir=(0.9999999998537095, -5.969561417335715e-07, -1.7094587273474584e-05), z_dir=(0, 0.9993908270190958, -0.03489949670250105))):
        with Locations((0.159665326, -4.247929052)):
            Circle(ESQUISSE12_R)
    extrude(amount=ENL_V_MAT_EXTRU_9_DEPTH, mode=Mode.SUBTRACT)

    # Esquisse17 → Boss.-Extru.2 (add)
    with BuildSketch(Plane(origin=(0, 1.099779964, -0.038405163), x_dir=(-1, 0, 0), z_dir=(0, -0.9993908270190958, 0.03489949670250106))):
        with Locations(Location((-0.146292507, -4.268691639, 0), (0, 0, 9.44628294))):
            Circle(ESQUISSE17_R)
    extrude(amount=BOSS_EXTRU_2_DEPTH)


solid = part_2.part
